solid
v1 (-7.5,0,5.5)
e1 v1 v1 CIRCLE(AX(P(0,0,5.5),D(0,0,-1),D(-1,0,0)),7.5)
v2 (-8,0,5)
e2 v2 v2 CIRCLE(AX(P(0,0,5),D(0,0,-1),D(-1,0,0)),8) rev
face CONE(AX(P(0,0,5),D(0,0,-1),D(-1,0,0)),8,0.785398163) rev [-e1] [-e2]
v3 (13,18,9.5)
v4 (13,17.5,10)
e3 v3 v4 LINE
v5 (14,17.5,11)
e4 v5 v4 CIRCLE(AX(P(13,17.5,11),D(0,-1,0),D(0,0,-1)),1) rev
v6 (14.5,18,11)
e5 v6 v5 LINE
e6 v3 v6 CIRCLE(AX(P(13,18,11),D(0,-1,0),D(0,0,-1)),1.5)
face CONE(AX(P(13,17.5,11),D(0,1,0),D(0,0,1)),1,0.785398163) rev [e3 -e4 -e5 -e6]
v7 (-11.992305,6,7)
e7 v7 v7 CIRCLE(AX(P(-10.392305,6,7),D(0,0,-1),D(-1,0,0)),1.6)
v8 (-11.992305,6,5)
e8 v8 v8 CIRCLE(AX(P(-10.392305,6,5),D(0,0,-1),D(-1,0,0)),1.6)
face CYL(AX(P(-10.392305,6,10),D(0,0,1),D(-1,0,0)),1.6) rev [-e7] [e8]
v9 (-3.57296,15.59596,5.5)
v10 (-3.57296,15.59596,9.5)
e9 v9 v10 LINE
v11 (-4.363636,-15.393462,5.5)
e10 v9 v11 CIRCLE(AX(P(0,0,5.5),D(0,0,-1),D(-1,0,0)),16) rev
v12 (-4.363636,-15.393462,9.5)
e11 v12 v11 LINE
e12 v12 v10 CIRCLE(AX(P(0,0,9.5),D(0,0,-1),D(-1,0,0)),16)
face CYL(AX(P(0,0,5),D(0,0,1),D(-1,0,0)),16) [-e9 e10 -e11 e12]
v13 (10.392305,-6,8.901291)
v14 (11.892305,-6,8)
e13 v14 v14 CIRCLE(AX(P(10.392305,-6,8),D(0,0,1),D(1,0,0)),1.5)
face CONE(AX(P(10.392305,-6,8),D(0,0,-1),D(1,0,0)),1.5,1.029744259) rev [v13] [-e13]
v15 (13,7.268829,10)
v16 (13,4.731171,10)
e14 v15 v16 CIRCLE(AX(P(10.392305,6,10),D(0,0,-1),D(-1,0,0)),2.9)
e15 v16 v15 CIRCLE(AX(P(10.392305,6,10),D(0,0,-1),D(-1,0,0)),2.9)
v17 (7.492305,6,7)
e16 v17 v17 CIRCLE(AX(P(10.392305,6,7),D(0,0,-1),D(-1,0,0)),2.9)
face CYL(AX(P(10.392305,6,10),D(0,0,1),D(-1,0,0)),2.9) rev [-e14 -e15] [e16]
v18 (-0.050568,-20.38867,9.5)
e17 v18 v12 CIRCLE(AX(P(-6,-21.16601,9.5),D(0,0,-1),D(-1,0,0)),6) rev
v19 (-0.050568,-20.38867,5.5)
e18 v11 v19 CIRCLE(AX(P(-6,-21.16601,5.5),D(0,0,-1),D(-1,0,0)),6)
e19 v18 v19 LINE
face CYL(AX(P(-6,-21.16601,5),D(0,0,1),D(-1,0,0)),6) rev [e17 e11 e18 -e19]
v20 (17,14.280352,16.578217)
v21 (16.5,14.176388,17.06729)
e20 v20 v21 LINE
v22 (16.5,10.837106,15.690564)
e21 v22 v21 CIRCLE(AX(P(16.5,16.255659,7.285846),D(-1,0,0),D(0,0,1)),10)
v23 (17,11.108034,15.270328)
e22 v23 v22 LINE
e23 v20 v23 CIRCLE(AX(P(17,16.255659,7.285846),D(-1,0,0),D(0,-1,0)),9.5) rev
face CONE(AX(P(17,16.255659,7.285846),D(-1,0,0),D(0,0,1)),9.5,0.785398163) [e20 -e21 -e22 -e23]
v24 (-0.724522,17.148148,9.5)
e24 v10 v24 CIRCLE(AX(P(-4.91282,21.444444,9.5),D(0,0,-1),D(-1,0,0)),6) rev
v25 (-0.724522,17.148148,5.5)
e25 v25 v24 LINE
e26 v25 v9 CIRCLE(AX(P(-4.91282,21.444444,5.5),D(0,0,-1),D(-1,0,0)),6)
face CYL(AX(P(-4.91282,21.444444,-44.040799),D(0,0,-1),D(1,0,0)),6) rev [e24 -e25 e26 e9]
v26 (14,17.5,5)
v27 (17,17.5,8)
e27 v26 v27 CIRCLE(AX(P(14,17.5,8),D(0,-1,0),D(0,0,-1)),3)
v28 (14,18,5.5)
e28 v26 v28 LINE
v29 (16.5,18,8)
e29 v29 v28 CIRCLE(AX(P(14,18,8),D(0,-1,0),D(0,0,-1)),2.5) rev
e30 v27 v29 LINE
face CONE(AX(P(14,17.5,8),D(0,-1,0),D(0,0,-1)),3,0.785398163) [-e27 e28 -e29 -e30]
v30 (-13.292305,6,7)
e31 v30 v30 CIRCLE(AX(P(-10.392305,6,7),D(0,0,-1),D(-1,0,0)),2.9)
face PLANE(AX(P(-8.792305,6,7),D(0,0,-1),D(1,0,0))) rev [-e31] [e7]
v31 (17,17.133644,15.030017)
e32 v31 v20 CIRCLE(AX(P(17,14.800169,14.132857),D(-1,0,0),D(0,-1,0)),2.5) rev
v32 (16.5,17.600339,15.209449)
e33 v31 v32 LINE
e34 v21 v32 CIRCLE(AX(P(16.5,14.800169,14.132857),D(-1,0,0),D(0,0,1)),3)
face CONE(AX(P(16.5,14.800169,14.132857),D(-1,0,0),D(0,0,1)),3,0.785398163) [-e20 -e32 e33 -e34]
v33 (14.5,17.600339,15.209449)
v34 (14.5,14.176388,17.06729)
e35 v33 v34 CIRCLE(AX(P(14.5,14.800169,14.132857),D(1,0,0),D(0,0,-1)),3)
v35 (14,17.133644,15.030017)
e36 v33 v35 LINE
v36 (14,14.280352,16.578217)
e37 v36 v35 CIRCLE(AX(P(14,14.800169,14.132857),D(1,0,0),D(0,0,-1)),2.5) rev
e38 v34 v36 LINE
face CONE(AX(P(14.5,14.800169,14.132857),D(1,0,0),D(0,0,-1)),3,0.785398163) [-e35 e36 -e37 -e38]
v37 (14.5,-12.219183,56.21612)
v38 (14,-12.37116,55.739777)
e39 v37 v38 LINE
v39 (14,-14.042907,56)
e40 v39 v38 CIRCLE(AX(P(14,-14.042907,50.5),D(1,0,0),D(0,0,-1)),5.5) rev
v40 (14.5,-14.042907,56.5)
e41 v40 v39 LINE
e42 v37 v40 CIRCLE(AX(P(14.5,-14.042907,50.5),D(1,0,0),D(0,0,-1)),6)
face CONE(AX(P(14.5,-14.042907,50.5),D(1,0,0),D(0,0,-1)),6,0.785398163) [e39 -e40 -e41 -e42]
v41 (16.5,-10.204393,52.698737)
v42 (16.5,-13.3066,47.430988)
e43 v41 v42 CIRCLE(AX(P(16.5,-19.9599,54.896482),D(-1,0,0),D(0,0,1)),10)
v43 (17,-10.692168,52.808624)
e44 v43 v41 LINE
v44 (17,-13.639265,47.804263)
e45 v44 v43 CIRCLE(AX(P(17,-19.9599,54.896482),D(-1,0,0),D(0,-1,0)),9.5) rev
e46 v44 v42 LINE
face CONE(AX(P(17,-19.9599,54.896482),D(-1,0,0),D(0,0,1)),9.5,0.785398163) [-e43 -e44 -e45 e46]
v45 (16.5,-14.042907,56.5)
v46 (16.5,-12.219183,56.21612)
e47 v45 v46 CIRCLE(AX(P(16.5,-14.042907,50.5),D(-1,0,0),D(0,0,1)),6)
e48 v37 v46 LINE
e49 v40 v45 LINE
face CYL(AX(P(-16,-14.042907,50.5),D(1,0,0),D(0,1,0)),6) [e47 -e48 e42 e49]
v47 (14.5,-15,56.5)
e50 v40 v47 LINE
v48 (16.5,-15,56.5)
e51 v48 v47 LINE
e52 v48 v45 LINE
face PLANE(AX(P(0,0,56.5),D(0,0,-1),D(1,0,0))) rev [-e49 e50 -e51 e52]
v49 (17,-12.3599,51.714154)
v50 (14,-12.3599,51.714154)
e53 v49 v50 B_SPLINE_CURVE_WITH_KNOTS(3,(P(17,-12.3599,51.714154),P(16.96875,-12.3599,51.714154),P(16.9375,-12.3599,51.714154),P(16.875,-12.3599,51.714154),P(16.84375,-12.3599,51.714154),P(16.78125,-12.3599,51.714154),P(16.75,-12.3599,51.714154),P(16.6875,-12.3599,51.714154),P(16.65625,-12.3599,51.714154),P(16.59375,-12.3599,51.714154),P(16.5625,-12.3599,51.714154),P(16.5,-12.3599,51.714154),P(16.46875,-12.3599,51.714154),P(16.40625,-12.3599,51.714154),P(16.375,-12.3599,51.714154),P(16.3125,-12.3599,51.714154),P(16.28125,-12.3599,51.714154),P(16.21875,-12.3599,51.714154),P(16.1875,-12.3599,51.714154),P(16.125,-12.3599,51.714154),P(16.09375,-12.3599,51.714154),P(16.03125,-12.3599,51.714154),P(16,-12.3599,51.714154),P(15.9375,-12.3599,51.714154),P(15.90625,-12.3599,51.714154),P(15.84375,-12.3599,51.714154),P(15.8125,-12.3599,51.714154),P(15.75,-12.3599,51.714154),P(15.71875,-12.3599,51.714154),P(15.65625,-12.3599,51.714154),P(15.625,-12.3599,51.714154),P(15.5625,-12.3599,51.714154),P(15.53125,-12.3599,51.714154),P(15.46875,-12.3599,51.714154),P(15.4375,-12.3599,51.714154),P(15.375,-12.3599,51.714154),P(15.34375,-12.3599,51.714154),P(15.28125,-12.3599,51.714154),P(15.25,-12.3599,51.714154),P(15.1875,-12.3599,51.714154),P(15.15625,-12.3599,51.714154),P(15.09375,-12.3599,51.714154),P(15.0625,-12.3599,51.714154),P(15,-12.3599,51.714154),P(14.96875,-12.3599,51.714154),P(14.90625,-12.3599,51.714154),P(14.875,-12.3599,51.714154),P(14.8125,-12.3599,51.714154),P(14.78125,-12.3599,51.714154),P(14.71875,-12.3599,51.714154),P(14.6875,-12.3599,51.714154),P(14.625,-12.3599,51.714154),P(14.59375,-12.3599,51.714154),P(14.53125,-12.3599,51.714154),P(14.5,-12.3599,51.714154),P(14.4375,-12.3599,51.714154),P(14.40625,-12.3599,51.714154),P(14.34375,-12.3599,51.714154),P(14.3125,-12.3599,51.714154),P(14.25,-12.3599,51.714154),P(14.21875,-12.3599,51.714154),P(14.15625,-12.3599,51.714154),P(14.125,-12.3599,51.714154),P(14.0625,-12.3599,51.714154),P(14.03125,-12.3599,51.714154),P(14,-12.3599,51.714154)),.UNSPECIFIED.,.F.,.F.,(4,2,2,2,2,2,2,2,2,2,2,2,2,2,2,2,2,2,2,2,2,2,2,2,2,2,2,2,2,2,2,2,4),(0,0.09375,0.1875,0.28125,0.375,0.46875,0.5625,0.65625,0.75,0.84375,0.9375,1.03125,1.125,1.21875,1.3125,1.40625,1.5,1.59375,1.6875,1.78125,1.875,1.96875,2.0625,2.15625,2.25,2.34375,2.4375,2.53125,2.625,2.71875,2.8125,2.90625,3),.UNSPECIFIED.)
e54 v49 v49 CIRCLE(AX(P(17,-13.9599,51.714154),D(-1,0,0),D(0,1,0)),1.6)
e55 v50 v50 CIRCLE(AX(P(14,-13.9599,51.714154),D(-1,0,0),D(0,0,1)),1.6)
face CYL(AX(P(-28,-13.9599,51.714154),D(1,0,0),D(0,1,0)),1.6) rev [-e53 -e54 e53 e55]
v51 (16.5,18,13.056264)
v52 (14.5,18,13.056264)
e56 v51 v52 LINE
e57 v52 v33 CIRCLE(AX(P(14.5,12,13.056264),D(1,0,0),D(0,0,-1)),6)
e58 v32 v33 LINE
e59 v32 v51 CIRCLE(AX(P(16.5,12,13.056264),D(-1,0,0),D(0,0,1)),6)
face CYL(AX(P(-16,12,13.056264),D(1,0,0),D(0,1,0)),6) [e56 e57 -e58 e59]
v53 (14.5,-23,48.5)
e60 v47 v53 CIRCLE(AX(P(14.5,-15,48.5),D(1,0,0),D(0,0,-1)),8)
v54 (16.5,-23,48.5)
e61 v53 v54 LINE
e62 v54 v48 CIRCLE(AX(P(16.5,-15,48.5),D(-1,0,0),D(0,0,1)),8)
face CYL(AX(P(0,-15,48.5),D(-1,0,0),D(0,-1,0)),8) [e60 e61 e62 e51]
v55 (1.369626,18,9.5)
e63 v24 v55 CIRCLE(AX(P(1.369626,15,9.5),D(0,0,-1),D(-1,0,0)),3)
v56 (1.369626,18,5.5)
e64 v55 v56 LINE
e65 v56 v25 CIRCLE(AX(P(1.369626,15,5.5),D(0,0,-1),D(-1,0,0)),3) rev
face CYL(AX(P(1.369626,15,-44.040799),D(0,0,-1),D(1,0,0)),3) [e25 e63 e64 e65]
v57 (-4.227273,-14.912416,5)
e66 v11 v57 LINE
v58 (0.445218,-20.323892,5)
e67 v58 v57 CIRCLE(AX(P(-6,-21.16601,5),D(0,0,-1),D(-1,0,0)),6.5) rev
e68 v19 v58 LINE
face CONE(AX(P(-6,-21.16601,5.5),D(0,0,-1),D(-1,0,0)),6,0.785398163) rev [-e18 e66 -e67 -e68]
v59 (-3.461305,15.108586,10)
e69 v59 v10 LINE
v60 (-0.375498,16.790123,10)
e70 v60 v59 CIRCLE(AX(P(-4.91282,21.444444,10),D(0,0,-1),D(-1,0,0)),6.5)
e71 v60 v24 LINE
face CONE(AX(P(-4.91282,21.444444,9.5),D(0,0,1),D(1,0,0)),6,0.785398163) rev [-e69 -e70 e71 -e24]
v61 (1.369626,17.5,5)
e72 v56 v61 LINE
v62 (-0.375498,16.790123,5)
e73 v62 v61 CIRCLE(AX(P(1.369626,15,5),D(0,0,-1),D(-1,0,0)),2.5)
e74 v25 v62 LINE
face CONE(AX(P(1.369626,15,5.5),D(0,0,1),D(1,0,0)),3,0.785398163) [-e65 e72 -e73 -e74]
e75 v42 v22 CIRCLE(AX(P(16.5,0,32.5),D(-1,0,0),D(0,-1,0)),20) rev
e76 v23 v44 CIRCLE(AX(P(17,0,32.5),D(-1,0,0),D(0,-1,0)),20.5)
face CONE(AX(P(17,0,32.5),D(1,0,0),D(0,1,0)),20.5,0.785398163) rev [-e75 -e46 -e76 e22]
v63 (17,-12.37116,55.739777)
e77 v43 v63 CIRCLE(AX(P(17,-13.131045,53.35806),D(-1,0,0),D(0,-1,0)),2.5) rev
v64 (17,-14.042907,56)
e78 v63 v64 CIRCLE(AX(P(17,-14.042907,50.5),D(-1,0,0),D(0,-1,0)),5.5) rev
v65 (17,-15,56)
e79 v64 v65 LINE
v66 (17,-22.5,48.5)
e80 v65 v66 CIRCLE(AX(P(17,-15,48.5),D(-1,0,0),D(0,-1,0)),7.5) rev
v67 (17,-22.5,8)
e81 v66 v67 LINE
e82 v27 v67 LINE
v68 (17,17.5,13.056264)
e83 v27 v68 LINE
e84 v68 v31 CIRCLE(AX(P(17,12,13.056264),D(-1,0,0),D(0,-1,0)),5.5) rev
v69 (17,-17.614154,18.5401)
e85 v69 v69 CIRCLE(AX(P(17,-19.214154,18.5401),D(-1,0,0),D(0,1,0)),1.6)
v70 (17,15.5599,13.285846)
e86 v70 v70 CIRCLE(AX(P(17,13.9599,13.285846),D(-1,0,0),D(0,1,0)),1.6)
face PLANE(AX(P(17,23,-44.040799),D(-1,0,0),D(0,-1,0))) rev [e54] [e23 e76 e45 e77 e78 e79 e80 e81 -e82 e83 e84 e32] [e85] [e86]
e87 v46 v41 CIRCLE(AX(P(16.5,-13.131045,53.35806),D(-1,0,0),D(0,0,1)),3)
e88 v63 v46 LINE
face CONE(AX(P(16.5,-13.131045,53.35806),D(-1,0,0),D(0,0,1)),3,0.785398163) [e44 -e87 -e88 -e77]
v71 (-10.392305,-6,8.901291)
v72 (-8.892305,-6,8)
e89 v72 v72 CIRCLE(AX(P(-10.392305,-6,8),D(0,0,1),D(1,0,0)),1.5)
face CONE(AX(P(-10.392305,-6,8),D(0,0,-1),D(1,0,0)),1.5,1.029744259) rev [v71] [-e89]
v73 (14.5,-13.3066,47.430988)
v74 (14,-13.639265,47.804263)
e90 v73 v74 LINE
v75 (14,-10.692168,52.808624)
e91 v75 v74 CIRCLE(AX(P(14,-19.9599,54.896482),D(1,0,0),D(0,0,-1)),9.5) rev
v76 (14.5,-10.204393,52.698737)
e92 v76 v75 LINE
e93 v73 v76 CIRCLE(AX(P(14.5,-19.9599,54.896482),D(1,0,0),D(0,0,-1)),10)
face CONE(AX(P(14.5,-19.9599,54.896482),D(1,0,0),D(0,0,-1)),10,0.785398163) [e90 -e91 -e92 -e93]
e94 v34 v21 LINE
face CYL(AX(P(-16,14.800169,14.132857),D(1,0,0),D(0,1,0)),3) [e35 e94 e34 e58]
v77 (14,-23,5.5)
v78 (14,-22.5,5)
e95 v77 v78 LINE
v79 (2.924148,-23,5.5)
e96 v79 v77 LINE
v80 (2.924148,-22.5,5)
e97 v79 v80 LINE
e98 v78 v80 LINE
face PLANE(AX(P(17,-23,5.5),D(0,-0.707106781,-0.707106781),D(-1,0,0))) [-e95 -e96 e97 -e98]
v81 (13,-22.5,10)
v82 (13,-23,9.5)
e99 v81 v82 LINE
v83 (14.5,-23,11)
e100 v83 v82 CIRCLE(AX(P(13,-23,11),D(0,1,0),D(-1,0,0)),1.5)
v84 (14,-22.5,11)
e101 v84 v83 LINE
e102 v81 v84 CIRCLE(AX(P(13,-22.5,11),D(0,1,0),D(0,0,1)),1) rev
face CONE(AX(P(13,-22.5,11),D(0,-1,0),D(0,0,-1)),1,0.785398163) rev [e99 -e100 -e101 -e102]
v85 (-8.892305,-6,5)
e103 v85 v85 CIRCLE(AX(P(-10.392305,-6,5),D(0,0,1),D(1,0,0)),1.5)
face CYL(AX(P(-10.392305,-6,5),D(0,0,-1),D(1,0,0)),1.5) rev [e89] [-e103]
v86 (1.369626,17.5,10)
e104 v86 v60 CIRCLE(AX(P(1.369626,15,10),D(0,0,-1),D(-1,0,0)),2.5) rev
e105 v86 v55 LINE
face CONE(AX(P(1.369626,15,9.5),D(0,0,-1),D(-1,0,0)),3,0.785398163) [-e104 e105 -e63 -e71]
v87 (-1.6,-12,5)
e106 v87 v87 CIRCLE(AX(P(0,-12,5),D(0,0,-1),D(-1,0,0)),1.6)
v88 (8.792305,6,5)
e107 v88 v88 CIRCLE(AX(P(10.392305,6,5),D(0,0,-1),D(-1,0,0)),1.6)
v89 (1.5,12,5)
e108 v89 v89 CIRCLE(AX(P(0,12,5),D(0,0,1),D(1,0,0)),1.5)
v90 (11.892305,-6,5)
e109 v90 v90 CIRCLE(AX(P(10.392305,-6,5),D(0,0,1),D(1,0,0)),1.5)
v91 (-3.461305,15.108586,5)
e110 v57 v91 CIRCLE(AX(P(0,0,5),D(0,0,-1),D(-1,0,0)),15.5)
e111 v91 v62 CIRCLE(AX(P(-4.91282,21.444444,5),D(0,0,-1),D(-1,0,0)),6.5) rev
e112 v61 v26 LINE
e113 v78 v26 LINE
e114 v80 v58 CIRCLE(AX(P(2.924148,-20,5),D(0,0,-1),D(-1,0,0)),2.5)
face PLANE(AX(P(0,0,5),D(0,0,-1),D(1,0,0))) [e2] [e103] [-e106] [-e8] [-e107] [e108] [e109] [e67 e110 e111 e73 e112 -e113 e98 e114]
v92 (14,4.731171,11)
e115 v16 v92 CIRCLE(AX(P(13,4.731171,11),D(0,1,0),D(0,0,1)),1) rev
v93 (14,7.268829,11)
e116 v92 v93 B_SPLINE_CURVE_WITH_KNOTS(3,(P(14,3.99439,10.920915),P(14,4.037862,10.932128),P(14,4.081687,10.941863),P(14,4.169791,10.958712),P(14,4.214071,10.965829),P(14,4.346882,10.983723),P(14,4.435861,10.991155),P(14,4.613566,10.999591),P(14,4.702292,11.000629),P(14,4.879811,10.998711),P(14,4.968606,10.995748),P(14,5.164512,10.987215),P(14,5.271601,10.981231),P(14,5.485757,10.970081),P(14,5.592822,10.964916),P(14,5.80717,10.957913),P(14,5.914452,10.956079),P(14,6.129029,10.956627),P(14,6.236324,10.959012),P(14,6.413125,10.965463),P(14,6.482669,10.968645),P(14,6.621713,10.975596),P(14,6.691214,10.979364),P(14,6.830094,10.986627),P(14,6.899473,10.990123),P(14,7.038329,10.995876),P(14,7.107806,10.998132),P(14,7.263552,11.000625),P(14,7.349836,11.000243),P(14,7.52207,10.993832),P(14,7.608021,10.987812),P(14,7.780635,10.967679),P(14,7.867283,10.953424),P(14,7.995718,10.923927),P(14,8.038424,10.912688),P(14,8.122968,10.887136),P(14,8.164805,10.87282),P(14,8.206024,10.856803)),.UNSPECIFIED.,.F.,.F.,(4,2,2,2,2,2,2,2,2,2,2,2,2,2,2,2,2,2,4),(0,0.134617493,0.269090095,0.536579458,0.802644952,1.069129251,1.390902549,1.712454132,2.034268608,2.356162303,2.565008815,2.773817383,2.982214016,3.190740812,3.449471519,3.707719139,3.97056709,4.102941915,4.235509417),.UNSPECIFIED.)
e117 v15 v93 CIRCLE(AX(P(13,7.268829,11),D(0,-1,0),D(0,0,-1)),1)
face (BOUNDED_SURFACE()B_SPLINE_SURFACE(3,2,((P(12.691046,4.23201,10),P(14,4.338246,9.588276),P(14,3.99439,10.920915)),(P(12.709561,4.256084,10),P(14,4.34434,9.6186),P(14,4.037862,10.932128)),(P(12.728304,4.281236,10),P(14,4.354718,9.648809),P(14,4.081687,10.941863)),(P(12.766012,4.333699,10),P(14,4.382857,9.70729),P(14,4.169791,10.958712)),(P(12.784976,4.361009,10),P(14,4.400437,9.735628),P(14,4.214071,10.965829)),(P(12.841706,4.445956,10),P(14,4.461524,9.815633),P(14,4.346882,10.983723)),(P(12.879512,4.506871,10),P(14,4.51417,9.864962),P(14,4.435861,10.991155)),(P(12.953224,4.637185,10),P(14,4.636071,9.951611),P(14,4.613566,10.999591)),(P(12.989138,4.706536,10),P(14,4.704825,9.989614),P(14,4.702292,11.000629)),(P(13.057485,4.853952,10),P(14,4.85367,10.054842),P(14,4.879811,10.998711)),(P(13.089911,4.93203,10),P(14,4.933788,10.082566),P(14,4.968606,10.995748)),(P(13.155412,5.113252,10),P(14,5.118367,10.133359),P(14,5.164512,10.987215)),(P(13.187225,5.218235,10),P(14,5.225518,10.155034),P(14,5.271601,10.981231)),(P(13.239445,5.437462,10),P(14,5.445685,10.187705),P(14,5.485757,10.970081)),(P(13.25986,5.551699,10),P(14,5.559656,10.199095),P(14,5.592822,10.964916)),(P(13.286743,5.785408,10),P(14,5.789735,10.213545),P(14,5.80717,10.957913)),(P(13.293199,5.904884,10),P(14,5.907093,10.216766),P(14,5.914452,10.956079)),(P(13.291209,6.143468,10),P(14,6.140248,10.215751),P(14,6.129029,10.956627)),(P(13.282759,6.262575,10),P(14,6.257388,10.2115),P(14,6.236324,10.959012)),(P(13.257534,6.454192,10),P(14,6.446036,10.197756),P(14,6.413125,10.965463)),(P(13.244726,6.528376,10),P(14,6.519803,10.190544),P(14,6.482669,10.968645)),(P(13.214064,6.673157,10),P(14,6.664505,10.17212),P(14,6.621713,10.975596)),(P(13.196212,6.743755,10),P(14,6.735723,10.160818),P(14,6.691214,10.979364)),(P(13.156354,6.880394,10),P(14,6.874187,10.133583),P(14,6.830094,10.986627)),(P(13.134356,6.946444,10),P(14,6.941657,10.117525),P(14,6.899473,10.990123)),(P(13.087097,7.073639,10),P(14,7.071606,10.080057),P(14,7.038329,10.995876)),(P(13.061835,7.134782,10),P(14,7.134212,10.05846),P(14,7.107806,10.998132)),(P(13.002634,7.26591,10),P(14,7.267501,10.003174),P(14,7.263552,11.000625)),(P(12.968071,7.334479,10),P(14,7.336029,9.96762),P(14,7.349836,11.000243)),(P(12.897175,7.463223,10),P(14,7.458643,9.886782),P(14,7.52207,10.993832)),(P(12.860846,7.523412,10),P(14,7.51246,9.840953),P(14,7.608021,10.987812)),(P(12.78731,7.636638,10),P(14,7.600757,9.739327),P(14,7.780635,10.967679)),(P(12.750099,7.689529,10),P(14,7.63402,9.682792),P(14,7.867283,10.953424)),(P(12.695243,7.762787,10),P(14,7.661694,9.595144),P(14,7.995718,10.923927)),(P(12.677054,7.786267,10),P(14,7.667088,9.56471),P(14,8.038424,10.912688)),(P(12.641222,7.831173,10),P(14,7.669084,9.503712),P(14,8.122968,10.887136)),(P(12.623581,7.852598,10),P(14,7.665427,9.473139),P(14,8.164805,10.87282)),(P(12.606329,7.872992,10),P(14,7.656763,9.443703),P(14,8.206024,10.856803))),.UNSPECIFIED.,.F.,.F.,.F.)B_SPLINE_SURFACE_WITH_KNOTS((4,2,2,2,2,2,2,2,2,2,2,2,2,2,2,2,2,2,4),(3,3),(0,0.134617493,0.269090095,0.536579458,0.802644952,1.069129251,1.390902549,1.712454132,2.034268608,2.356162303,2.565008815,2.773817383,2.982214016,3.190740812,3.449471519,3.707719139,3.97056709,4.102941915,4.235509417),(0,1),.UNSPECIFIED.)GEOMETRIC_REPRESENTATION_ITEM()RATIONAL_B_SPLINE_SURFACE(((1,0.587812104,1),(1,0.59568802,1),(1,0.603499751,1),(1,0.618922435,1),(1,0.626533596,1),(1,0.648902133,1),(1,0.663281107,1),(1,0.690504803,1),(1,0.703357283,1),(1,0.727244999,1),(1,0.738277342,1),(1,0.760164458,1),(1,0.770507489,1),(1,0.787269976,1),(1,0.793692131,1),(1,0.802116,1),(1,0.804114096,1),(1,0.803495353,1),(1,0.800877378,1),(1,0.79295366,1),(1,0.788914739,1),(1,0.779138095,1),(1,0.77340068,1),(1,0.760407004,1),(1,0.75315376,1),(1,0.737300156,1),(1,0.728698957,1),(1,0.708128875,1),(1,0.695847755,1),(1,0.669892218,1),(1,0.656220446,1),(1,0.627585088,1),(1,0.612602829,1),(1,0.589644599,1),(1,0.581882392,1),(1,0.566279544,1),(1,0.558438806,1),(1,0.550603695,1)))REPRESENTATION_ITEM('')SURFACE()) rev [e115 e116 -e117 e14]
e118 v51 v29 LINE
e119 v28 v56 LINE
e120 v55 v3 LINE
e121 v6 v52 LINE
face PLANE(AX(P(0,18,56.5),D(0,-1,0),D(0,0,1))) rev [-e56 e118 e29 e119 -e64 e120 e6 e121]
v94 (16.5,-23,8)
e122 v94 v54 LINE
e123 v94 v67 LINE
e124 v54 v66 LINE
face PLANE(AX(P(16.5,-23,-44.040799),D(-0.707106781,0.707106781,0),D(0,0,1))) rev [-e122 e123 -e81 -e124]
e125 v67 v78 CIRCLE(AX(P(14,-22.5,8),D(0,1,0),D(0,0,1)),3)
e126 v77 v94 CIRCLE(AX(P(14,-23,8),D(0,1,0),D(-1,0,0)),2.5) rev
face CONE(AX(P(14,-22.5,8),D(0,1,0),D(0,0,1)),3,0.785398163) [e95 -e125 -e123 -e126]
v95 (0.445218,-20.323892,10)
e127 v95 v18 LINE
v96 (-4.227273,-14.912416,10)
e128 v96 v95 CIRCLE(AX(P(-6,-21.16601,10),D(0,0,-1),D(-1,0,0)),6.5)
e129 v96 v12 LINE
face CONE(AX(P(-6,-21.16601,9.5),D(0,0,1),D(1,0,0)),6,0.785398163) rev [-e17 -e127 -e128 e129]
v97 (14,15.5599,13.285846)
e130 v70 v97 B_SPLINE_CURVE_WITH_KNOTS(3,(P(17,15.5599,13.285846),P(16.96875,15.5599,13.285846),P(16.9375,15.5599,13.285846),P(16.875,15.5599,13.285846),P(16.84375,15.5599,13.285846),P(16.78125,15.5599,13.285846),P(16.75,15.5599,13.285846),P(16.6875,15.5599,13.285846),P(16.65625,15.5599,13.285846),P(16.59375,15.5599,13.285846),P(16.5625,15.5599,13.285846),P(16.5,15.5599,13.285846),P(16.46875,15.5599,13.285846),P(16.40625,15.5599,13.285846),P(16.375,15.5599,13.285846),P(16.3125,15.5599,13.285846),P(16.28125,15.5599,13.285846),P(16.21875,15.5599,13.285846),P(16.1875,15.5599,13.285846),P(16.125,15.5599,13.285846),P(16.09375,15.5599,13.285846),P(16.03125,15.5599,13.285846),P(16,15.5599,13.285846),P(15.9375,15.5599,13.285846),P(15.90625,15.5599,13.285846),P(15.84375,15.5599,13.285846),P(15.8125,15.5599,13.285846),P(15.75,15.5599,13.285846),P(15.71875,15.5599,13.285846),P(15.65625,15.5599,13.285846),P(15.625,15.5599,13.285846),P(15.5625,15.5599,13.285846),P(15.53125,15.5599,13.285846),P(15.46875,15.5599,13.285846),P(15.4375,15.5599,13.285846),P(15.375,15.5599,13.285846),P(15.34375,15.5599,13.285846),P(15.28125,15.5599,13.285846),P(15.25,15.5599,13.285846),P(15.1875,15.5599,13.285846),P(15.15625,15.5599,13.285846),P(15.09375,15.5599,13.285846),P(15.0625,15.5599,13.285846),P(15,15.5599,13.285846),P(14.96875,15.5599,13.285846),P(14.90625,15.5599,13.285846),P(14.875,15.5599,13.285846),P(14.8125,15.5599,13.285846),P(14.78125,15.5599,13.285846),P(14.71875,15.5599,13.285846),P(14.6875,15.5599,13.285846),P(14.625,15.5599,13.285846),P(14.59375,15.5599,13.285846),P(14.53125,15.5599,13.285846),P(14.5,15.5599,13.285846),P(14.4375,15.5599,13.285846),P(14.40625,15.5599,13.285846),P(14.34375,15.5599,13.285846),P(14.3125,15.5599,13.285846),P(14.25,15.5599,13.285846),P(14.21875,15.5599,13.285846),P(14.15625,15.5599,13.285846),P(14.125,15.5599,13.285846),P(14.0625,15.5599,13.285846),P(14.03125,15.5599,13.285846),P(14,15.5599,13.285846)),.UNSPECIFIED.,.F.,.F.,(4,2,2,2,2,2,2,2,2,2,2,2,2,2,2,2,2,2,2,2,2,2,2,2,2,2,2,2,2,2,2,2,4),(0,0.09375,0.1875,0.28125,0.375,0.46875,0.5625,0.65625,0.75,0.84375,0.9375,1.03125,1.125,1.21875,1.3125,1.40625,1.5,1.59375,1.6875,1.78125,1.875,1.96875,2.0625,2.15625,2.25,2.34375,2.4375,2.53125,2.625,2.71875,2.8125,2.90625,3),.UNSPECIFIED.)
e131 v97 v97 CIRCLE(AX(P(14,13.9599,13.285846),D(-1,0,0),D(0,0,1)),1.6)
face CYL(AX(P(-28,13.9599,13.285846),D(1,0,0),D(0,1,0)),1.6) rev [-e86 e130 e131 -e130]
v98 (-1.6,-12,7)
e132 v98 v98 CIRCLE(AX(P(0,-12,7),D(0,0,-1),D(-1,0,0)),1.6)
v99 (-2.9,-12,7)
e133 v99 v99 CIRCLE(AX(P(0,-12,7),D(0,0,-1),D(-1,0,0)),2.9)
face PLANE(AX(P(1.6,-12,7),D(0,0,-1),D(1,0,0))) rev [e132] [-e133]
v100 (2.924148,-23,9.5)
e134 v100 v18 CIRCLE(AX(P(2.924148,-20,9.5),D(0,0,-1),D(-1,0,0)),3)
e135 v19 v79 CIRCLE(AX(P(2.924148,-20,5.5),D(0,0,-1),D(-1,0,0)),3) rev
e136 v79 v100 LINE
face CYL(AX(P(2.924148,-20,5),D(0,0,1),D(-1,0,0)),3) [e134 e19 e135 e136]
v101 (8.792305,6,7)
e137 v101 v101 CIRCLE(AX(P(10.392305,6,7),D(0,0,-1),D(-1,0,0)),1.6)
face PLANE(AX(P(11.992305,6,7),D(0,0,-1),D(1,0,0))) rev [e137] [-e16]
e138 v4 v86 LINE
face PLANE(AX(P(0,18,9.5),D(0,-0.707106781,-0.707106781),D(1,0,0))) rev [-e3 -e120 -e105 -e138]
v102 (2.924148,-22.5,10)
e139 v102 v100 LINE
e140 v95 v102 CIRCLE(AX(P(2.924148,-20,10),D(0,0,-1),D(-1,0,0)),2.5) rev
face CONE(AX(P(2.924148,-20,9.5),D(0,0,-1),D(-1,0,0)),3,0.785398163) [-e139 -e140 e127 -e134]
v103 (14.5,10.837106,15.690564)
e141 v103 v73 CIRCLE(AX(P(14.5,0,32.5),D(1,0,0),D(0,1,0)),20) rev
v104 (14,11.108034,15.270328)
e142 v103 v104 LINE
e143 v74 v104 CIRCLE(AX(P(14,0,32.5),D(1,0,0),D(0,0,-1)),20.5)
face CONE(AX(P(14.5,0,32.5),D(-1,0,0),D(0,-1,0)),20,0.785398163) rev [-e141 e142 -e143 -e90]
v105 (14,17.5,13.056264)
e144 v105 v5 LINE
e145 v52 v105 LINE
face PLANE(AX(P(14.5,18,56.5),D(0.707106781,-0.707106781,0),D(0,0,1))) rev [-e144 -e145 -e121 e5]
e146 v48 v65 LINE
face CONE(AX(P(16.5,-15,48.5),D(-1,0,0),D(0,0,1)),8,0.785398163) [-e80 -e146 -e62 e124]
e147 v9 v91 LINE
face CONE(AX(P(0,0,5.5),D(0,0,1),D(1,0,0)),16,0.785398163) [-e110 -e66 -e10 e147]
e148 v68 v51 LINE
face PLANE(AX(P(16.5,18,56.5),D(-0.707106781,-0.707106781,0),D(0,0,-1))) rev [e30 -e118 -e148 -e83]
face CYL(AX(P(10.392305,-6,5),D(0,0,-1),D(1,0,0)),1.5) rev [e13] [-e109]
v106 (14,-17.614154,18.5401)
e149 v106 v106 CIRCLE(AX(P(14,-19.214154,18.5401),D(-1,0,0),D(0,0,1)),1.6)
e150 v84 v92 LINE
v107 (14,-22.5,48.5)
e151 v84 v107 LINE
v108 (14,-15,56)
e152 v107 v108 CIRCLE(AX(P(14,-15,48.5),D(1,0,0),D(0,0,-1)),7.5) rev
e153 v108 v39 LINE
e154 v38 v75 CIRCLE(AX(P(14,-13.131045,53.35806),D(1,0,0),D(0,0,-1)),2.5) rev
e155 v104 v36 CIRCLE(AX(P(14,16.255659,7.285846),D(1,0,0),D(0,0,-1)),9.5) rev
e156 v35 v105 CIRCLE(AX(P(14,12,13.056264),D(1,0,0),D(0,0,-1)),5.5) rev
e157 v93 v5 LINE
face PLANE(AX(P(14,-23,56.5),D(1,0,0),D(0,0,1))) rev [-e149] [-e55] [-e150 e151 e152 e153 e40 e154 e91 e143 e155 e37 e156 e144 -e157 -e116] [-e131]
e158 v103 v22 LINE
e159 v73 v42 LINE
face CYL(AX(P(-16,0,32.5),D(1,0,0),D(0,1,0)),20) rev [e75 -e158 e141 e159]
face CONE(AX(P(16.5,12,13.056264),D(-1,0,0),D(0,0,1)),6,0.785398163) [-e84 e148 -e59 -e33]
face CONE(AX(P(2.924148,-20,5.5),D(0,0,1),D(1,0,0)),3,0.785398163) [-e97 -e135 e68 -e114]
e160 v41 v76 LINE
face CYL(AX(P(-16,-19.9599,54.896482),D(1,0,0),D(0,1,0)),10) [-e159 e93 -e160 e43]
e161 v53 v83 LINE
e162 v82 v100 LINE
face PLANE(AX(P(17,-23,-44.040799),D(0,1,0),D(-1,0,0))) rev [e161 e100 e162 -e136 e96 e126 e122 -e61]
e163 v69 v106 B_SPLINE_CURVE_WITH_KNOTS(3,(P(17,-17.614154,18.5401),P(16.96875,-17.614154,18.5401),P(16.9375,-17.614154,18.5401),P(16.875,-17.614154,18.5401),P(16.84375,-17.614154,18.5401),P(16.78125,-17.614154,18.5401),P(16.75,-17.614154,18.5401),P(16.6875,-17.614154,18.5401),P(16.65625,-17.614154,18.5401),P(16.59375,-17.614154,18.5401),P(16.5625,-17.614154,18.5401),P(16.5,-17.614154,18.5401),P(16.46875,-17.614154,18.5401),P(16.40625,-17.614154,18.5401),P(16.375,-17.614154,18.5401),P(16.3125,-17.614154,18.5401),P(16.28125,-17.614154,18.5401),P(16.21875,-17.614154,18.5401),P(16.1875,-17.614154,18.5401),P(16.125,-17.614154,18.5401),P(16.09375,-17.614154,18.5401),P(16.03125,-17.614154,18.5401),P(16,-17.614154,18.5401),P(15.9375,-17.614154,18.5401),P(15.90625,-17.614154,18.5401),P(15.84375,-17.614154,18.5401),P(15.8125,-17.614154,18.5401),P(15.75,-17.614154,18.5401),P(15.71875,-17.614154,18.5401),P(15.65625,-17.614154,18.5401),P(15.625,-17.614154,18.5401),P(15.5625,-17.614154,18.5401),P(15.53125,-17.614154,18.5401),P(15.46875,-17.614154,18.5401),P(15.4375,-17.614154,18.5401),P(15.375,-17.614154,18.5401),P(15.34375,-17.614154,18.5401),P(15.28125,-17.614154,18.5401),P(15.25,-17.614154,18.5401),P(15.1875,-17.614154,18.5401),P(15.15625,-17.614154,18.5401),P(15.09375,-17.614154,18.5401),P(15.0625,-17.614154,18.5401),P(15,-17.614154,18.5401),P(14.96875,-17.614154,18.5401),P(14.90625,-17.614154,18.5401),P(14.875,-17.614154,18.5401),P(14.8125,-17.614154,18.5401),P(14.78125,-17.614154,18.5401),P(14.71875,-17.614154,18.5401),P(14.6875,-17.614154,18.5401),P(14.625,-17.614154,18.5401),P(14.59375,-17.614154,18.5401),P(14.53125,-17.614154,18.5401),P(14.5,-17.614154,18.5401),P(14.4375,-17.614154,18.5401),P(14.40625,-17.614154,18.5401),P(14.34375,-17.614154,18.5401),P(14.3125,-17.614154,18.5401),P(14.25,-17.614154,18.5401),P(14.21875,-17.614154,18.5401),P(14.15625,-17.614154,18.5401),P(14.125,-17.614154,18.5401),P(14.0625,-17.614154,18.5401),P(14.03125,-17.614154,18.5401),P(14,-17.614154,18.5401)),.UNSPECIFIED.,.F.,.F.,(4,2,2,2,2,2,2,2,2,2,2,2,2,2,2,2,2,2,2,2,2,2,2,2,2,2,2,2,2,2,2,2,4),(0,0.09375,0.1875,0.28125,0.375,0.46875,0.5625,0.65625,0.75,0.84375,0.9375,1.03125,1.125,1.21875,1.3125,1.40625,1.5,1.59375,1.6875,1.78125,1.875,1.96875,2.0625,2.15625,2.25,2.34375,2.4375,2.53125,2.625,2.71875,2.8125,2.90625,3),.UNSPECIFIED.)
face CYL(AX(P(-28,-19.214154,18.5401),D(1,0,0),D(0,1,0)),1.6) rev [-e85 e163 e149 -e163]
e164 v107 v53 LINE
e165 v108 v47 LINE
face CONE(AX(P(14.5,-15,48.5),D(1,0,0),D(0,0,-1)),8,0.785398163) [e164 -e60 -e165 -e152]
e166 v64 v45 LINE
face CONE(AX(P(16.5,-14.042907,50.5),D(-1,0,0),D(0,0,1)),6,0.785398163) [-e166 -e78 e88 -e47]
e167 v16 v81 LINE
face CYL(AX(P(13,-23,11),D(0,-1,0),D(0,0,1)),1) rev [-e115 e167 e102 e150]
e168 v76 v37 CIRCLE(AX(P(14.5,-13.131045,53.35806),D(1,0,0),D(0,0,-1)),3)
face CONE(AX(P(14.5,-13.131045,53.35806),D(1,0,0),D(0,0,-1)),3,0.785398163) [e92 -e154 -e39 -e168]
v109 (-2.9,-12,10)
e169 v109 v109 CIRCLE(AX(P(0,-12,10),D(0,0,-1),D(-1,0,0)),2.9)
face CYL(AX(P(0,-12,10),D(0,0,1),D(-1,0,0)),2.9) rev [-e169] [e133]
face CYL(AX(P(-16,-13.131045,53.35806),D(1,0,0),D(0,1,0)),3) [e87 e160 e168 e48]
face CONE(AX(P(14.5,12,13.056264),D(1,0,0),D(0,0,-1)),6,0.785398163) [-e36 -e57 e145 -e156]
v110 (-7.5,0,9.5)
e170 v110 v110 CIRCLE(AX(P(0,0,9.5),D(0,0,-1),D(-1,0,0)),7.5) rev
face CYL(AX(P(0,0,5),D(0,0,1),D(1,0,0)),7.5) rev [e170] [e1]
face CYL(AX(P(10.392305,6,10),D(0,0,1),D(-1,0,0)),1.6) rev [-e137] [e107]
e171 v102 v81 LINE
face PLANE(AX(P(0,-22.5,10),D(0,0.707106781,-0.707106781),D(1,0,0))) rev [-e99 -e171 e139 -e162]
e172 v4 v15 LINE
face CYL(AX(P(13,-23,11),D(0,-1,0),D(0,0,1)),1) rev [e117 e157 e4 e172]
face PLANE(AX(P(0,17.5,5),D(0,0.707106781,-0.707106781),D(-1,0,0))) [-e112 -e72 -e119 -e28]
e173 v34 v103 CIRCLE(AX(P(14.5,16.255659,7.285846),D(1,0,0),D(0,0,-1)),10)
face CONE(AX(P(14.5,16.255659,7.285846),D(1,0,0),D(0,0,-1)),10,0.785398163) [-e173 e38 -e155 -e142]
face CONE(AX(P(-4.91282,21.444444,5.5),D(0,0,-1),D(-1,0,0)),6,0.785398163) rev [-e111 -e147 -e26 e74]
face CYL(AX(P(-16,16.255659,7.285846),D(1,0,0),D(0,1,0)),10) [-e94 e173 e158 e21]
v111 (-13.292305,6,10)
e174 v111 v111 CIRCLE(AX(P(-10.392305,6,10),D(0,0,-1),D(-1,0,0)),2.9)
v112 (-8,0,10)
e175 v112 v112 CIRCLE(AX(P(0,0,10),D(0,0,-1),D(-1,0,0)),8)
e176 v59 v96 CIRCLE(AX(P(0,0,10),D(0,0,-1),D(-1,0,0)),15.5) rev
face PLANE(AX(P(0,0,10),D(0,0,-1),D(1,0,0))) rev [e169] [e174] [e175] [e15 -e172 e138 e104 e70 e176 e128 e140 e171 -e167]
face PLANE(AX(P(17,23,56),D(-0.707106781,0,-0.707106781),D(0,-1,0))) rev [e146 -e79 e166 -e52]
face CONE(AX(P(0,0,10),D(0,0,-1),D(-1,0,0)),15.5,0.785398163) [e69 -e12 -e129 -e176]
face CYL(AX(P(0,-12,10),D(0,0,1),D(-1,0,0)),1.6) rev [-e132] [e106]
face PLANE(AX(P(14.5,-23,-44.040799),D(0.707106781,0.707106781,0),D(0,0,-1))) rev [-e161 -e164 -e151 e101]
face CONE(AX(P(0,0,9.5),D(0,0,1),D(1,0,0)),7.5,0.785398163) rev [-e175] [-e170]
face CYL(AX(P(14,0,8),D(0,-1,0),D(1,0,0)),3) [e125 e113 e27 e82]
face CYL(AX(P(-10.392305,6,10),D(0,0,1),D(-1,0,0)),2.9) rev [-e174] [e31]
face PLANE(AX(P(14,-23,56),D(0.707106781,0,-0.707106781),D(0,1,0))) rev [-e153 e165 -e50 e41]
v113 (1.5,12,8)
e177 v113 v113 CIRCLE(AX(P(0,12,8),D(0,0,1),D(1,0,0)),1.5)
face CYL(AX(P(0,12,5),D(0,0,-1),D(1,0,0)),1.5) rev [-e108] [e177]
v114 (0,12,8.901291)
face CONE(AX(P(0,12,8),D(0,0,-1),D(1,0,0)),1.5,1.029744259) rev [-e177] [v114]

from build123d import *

# Parameters (mm, degrees)
SKETCH_1_R                = 16
EXTRUDE_1_DEPTH           = 5
F_3_0MM_1_D               = 3
F_3_0MM_1_DEPTH           = 3
F_3_0MM_1_TIP             = 0.901290929
HOLE_WIZARD_1_D           = 3.2
HOLE_WIZARD_1_DEPTH       = 5
HOLE_WIZARD_1_CBORE_D     = 5.8
HOLE_WIZARD_1_CBORE_DEPTH = 3
HOLE_WIZARD_1_TIP         = 0.96137699
EXTRUDE_2_DEPTH           = 5
SKETCH_9_W                = 3
SKETCH_9_H                = 46
EXTRUDE_3_DEPTH           = 46.5
SKETCH_12_R               = 1.6
CUT_EXTRUDE_1_DEPTH       = 45
CUT_EXTRUDE_2_DEPTH       = 62.483737687
SKETCH_17_W               = 28.420595315
SKETCH_17_H               = 5
CUT_EXTRUDE_3_DEPTH       = 59.908827861
FILLET_3_R                = 6
FILLET_4_R                = 3
FILLET_5_R                = 1
FILLET_6_R                = 8
CUT_EXTRUDE_4_DEPTH       = 64.326534875
CUT_EXTRUDE_4_DEPTH_BACK  = 64.326534875
SKETCH_18_W               = 60.691939919
SKETCH_18_H               = 58.869698126
SKETCH_19_R               = 7.5
CUT_EXTRUDE_5_DEPTH       = 55.591666189
CHAMFER_1_SIZE            = 0.5


with BuildPart() as part:
    # 草图1 → 凸台-拉伸1 (new body)
    with BuildSketch(Plane.XY):
        Circle(SKETCH_1_R)
    extrude(amount=EXTRUDE_1_DEPTH)

    # Ø3.0mm 暗销孔1
    with Locations(Plane.XY.offset(5)):
        with Locations((0, 12), (10.392304845, -6), (-10.392304845, -6)):
            Hole(F_3_0MM_1_D / 2, depth=F_3_0MM_1_DEPTH)
            with Locations((0, 0, -(F_3_0MM_1_DEPTH + F_3_0MM_1_TIP / 2))):  # 118° drill point
                Cone(0, F_3_0MM_1_D / 2, F_3_0MM_1_TIP, mode=Mode.SUBTRACT)

    # 孔1
    with Locations(Plane(origin=(0, 0, 0), x_dir=(-1, 0, 0), z_dir=(0, 0, -1))):
        with Locations((0, -12), (-10.392304845, 6), (10.392304845, 6)):
            CounterBoreHole(HOLE_WIZARD_1_D / 2, HOLE_WIZARD_1_CBORE_D / 2, HOLE_WIZARD_1_CBORE_DEPTH, depth=HOLE_WIZARD_1_DEPTH)
            with Locations((0, 0, -(HOLE_WIZARD_1_DEPTH + HOLE_WIZARD_1_TIP / 2))):  # 118° drill point
                Cone(0, HOLE_WIZARD_1_D / 2, HOLE_WIZARD_1_TIP, mode=Mode.SUBTRACT)

    # 草图8 → 凸台-拉伸2 (add)
    with BuildSketch(Plane.XY):
        with BuildLine():
            Line((0, 23), (17, 23))
            Line((17, 23), (17, -23))
            Line((17, -23), (0, -23))
            Line((0, -23), (0, -16))
            ThreePointArc((0, -16), (16, 0), (0, 16))
            Line((0, 16), (0, 23))
        make_face()
    extrude(amount=EXTRUDE_2_DEPTH)

    # 草图9 → 凸台-拉伸3 (add)
    with BuildSketch(Plane(origin=(0, 0, 0), x_dir=(-1, 0, 0), z_dir=(0, 0, -1))):
        with Locations((-15.5, 0)):
            Rectangle(SKETCH_9_W, SKETCH_9_H)
    extrude(amount=EXTRUDE_3_DEPTH)

    # 草图12 → 切除-拉伸1 (cut)
    with BuildSketch(Plane(origin=(17, 0, 0), x_dir=(0, 0, -1), z_dir=(1, 0, 0))):
        with Locations(Location((3.285846384, 13.959899742, 0), (0, 0, 90))):
            Circle(SKETCH_12_R)
        with Locations(Location((36.459899742, 19.214153616, 0), (0, 0, 90))):
            Circle(SKETCH_12_R)
        with Locations(Location((41.714153616, -13.959899742, 0), (0, 0, 90))):
            Circle(SKETCH_12_R)
        with Locations(Location((8.540100258, -19.214153616, 0), (0, 0, 90))):
            Circle(SKETCH_12_R)
    extrude(amount=-CUT_EXTRUDE_1_DEPTH, mode=Mode.SUBTRACT)

    # 草图14 → 切除-拉伸2 (cut, through all)
    with BuildSketch(Plane(origin=(17, 0, 0), x_dir=(0, 0, -1), z_dir=(1, 0, 0))):
        with BuildLine():
            Line((7.285846384, 23), (7.285846384, 16.255659243))
            ThreePointArc((7.285846384, 16.255659243), (6.878739032, 13.431405246), (5.690564256, 10.837106162))
            ThreePointArc((5.690564256, 10.837106162), (10.391665009, -15.918172751), (37.430987945, -13.306599828))
            ThreePointArc((37.430987945, -13.306599828), (40.805821772, -10.83485182), (44.896481918, -9.959899742))
            Line((44.896481918, -9.959899742), (46.5, -9.959899742))
            Line((46.5, -9.959899742), (46.5, 23))
            Line((46.5, 23), (7.285846384, 23))
        make_face()
    extrude(amount=-CUT_EXTRUDE_2_DEPTH, mode=Mode.SUBTRACT)

    # 草图17 → 切除-拉伸3 (cut, through all)
    with BuildSketch(Plane.XY.offset(5)):
        with Locations((14.210297658, 20.5)):
            Rectangle(SKETCH_17_W, SKETCH_17_H)
    extrude(amount=-CUT_EXTRUDE_3_DEPTH, mode=Mode.SUBTRACT)

    # 圆角3
    # the kernel refuses this fillet: 6 mm, written as the material it adds along each edge
    with BuildSketch(Plane(origin=(0, -16, 0), x_dir=(-0.9904775075289876, 0.1376746421065417, 0), z_dir=(0, 0, 1))) as fillet_3_piece_1:
        with BuildLine():
            CenterArc((5.2316364, 5.942865045), FILLET_3_R, 187.913310066, 74.173379868)
            Line((-0.711228645, 5.116817193), (-0.830085946, 5.100296235))
            Line((-0.830085946, 5.100296235), (-0.118857301, -0.016520957))
            Line((-0.118857301, -0.016520957), (0.016520957, -0.118857301))
            ThreePointArc((0.016520957, -0.118857301), (2.202794274, 0.03235988), (4.38906759, -0.118857301))
            Line((4.38906759, -0.118857301), (4.405588547, 0))
        make_face()
    extrude(amount=5)
    with BuildSketch(Plane(origin=(0, 16, 0), x_dir=(-0.993666814064824, -0.11236664374387297, 0), z_dir=(0, 0, 1))) as fillet_3_piece_2:
        with BuildLine():
            CenterArc((4.269932462, -5.962000884), FILLET_3_R, 96.45176027, 42.061664666)
            Line((-0.224733287, -1.987333628), (-0.314626602, -1.907840283))
            ThreePointArc((-0.314626602, -1.907840283), (-0.231606661, -0.980182817), (-0.119240018, 0.013483997))
            Line((-0.119240018, 0.013483997), (0.013483997, 0.119240018))
            ThreePointArc((0.013483997, 0.119240018), (1.7978663, 0.018669025), (3.582248603, 0.119240018))
            Line((3.582248603, 0.119240018), (3.5957326, 0))
        make_face()
    extrude(amount=5)
    # the kernel refuses this fillet: 6 mm, written as the material it takes off along each edge
    with BuildSketch(Plane(origin=(27.207517679, -9.959899742, -46.5), x_dir=(0, 0, 1), z_dir=(-1, 0, 0))) as fillet_3_2_piece_1:
        with BuildLine():
            CenterArc((6, -4.083007072), FILLET_3_R, 137.117180669, 42.882819331)
            Line((0, -4.083007072), (-0.12, -4.083007072))
            Line((-0.12, -4.083007072), (-0.12, 0))
            Line((-0.12, 0), (0, 0.12))
            ThreePointArc((0, 0.12), (0.801759041, 0.12), (1.515588444, 0.081660141))
            Line((1.515588444, 0.081660141), (1.603518082, 0))
        make_face()
    extrude(amount=23.415035358, mode=Mode.SUBTRACT)
    with BuildSketch(Plane(origin=(3.426044847, 18, -7.285846384), x_dir=(0, 0, 1), z_dir=(1, 0, 0))) as fillet_3_2_piece_2:
        with BuildLine():
            CenterArc((4.229582061, 6), FILLET_3_R, 225.176083116, 44.823916884)
            Line((0, 1.744340757), (-0.084591641, 1.659227573))
            ThreePointArc((-0.084591641, 1.659227573), (-0.12, 0.872170379), (-0.12, 0))
            Line((-0.12, 0), (0, -0.12))
            Line((0, -0.12), (4.229582061, -0.12))
            Line((4.229582061, -0.12), (4.229582061, 0))
        make_face()
    extrude(amount=24.147910306, mode=Mode.SUBTRACT)

    # 圆角4
    fillet_4_edges = [part.edges().sort_by_distance(p)[0] for p in [
        (17, -2.5, 5),
        (15.5, -9.959899742, -44.896481918),
        (0, -23, 2.5),
        (0, 18, 2.5),
        (15.5, 16.255659243, -7.285846384),
    ]]
    fillet(fillet_4_edges, radius=FILLET_4_R)

    # 圆角5
    fillet_5_edges = [part.edges().sort_by_distance(p)[0] for p in [
        (14, -2.5, 0),
    ]]
    fillet(fillet_5_edges, radius=FILLET_5_R)

    # 圆角6
    fillet_6_edges = [part.edges().sort_by_distance(p)[0] for p in [
        (15.5, -23, -46.5),
    ]]
    fillet(fillet_6_edges, radius=FILLET_6_R)


with BuildPart() as body_2:
    # 镜向1: mirrored copy
    add(part.part.mirror(Plane.XY.offset(5)))

    # 草图19 → 切除-拉伸5 (cut, through all)
    with BuildSketch(Plane.XY.offset(10)):
        Circle(SKETCH_19_R)
    extrude(amount=-CUT_EXTRUDE_5_DEPTH, mode=Mode.SUBTRACT)

    # 倒角1
    chamfer_1_edges = [body_2.edges().sort_by_distance(p)[0] for p in [
        (17, -15.918172751, 20.391665009),
        (17, -11.343083088, 49.821989751),
        (17, 18, 10.528132161),
        (17, -14.521453407, 56.5),
        (17, -13.120063884, 56.42860531),
        (14, 17.899238657, 14.151245267),
        (-15.994794668, 0.408097436, 5),
        (-15.994794668, 0.408097436, 10),
        (-1.458623572, -17.244798923, 5),
        (-2.041852688, 16.175901434, 10),
        (8.462074056, -23, 5),
        (7.962074056, -23, 10),
        (17, -23, 28.25),
        (16.121320344, -23, 5.878679656),
        (7.184813213, 18, 10),
        (-1.458623572, -17.244798923, 10),
        (0.239238095, 17.778888667, 10),
        (0.94500821, -22.254552116, 10),
        (7.684813213, 18, 5),
        (-2.041852688, 16.175901434, 5),
        (0.239238095, 17.778888667, 5),
        (0.94500821, -22.254552116, 5),
        (16.121320344, 18, 5.878679656),
        (17, 12.444073597, 16.530943185),
        (14, 12.444073597, 16.530943185),
        (17, 17.899238657, 14.151245267),
        (17, -10.527865197, 54.849185717),
        (17, 16.230924248, 16.769699588),
        (14, -13.120063884, 56.42860531),
        (14, -10.527865197, 54.849185717),
        (14, 16.230924248, 16.769699588),
        (14, 18, 12.028132161),
        (13.707106781, 18, 10.292893219),
        (13.707106781, -23, 10.292893219),
        (14, -14.521453407, 56.5),
        (14, -23, 29.75),
        (14, -20.656854249, 54.156854249),
        (17, -20.656854249, 54.156854249),
        (-7.5, 0, 5),
        (-7.5, 0, 10),
        (14, -15.918172751, 20.391665009),
        (14, -11.343083088, 49.821989751),
    ]]
    chamfer(chamfer_1_edges, length=CHAMFER_1_SIZE)


with BuildPart() as part_1:
    add(part.part)

    # 草图18 → 切除-拉伸4 (cut, two sides: drawn at the far end of the back side and taken through both)
    with BuildSketch(Plane(origin=(0, 0, 0), x_dir=(1, 0, 0), z_dir=(0, 1, 0)).offset(-CUT_EXTRUDE_4_DEPTH_BACK)):
        with Locations((-2.212398845, 24.434849063)):
            Rectangle(SKETCH_18_W, SKETCH_18_H)
    extrude(amount=CUT_EXTRUDE_4_DEPTH + CUT_EXTRUDE_4_DEPTH_BACK, mode=Mode.SUBTRACT)


solid = body_2.part
